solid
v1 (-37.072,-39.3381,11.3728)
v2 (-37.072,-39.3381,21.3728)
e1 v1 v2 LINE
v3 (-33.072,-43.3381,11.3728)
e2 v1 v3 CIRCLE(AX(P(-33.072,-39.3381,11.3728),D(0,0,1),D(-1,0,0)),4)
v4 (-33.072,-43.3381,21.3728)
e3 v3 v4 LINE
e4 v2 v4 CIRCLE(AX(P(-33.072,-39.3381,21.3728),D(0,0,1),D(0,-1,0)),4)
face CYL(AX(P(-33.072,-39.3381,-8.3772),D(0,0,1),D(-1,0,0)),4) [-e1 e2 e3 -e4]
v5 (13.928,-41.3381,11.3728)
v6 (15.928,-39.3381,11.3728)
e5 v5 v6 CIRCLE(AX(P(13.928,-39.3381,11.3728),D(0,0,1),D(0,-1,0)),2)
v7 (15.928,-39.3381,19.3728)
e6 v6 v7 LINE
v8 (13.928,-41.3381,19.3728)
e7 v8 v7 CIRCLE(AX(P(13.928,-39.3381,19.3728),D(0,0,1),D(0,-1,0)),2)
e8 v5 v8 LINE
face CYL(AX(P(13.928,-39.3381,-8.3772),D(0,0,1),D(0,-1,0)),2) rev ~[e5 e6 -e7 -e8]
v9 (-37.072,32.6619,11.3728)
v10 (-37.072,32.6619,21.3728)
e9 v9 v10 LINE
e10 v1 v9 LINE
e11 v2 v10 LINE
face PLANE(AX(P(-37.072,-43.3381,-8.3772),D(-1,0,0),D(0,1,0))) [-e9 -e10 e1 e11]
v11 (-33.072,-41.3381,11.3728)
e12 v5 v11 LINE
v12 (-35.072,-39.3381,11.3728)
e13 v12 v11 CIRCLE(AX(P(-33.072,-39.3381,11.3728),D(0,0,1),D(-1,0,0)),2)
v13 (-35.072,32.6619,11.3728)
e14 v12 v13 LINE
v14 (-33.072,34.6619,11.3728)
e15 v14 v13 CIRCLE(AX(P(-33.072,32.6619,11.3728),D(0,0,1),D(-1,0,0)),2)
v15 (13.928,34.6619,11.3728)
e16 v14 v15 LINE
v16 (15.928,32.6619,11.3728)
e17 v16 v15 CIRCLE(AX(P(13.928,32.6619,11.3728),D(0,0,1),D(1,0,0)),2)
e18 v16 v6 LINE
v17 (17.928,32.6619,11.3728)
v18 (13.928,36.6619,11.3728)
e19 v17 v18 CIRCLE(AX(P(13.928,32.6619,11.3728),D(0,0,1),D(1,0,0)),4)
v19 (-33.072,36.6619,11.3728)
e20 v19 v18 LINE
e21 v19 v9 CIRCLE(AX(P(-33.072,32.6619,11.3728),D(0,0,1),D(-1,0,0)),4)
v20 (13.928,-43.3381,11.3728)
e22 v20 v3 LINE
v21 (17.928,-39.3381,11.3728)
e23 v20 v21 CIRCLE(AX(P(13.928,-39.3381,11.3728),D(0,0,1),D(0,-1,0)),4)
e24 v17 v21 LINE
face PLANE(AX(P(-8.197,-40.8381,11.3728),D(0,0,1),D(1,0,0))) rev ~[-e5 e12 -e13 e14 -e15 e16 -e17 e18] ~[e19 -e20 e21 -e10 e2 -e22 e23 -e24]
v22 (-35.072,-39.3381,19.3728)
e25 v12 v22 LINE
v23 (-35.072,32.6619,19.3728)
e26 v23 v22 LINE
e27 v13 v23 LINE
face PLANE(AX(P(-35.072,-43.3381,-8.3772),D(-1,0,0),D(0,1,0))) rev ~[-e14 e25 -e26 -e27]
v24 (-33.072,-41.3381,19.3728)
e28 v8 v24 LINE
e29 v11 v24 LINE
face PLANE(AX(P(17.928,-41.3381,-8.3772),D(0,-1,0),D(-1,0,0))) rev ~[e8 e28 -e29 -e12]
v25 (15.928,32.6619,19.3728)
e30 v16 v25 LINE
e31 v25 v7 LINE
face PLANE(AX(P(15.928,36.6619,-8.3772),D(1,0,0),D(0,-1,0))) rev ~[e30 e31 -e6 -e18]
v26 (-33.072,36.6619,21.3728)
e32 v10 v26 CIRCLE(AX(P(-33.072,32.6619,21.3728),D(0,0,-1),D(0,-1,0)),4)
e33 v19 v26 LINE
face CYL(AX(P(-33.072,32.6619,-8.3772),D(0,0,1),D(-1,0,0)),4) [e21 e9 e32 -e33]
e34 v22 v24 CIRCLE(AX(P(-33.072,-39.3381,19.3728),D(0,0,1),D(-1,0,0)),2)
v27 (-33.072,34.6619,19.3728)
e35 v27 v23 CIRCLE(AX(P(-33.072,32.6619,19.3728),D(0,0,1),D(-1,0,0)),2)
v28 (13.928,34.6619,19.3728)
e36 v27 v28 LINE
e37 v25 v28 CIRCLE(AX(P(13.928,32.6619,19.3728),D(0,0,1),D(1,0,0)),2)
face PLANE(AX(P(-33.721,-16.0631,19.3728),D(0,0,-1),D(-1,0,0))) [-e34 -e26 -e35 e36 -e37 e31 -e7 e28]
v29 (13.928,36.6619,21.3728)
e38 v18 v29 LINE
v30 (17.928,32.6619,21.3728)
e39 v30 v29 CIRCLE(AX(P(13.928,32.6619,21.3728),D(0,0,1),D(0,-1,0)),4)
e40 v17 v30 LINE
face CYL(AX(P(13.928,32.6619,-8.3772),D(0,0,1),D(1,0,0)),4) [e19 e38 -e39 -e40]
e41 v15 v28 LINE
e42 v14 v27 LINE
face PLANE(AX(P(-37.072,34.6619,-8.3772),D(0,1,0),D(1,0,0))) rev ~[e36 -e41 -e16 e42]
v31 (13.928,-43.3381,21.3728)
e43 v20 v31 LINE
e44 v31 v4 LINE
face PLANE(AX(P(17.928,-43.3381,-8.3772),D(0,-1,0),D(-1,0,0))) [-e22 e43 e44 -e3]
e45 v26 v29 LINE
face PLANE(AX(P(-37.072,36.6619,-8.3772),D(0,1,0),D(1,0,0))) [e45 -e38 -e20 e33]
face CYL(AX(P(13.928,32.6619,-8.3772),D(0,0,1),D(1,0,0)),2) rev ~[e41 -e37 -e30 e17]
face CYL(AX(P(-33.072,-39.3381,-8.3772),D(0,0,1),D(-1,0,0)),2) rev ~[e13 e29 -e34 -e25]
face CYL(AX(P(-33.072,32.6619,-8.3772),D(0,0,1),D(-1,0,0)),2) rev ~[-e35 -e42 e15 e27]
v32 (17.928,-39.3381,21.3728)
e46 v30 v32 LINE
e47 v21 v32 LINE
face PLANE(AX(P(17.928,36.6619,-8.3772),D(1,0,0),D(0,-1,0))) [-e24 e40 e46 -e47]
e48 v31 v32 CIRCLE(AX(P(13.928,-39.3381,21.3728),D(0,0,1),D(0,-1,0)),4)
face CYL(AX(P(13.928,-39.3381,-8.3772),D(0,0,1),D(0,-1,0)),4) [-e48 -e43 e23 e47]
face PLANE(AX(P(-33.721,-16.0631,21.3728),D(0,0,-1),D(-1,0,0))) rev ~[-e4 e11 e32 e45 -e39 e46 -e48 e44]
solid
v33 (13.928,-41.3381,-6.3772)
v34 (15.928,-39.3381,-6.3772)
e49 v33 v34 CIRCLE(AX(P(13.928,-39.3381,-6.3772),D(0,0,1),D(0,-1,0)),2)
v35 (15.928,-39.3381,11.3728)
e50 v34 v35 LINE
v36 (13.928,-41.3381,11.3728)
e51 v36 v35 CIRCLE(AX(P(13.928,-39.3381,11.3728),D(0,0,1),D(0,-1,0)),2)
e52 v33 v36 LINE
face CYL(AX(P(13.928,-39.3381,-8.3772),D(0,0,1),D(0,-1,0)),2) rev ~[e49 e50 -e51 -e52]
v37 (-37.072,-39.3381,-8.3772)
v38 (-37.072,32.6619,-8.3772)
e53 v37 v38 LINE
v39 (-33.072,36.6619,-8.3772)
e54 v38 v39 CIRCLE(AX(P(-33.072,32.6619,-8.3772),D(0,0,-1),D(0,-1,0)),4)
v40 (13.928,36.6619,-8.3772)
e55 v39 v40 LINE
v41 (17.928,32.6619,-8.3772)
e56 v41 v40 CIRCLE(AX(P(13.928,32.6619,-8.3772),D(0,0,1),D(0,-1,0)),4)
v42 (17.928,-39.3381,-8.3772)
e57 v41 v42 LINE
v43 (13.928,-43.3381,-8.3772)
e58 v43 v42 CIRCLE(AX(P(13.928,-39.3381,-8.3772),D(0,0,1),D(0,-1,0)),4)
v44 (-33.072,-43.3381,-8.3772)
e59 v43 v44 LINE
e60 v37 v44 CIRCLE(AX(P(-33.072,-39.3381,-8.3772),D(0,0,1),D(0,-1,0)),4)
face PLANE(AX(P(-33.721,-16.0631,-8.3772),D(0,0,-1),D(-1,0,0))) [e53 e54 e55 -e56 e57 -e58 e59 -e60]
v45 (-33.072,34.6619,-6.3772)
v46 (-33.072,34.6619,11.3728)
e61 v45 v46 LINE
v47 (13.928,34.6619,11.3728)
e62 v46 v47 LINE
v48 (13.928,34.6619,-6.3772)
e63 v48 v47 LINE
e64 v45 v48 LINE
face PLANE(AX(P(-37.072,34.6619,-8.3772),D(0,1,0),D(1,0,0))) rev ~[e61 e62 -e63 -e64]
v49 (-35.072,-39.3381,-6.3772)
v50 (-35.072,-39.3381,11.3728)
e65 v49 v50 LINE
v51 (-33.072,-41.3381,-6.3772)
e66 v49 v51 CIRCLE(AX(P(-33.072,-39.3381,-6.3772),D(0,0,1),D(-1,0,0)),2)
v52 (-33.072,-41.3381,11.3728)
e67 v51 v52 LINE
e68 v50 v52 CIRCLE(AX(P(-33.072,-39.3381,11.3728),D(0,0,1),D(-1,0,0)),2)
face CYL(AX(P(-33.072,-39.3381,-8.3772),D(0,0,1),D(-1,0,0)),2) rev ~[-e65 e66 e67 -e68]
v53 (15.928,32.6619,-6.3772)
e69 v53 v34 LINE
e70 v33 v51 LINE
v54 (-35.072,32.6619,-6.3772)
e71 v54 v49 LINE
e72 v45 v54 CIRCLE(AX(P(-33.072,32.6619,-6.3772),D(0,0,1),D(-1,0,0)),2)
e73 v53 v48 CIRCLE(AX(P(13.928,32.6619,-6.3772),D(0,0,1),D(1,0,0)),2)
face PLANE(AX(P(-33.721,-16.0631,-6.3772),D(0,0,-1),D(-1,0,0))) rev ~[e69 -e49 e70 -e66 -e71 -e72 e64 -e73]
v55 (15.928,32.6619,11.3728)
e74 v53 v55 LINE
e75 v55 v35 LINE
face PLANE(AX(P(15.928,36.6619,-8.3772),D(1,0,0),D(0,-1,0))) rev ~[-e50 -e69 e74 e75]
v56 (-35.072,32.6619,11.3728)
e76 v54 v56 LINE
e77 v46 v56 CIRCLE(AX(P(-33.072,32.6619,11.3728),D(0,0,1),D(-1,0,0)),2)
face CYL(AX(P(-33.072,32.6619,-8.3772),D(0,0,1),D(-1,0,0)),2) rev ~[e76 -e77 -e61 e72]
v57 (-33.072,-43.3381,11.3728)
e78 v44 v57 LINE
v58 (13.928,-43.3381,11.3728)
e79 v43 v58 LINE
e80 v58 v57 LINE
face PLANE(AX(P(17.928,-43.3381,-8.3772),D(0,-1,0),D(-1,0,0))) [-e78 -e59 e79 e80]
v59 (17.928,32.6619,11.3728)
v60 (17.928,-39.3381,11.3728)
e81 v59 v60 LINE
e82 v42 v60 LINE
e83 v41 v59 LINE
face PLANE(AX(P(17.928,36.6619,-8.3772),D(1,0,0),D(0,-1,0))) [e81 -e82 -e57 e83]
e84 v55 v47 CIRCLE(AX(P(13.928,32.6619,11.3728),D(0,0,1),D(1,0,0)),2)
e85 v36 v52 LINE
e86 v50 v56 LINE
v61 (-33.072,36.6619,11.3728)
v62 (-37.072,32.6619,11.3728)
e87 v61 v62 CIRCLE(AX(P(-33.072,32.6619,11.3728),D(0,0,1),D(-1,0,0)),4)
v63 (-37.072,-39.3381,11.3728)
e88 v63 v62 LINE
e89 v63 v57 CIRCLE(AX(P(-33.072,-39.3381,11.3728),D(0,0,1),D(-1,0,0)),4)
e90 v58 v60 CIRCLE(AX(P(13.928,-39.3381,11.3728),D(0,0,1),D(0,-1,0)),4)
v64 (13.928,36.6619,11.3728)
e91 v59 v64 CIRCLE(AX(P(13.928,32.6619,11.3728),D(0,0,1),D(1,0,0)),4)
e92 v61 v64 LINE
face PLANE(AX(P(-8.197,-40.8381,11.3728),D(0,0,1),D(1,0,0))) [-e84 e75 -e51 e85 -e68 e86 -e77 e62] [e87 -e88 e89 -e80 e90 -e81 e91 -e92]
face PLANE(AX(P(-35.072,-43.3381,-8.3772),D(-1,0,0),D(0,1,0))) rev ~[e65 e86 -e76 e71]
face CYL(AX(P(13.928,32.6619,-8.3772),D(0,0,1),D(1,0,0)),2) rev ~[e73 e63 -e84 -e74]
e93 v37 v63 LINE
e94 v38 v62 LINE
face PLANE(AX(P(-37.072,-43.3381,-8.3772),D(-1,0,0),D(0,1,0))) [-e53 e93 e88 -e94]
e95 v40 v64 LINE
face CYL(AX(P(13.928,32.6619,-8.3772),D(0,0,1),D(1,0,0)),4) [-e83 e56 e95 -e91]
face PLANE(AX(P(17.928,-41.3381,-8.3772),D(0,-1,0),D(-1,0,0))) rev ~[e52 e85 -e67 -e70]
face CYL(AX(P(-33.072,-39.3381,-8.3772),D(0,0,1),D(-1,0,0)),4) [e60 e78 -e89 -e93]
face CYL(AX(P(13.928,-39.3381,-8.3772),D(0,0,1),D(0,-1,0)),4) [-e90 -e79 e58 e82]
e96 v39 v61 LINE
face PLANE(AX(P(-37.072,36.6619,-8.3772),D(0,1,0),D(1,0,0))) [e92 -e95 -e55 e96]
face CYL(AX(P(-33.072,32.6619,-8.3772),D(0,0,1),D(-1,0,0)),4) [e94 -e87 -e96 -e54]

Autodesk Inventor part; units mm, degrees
ref_plane "YZ Plane" through (0, 0, 0) normal (1, 0, 0) x (0, 1, 0)
ref_plane "XZ Plane" through (0, 0, 0) normal (0, 1, 0) x (-1, 0, 0)
ref_plane "Work Plane3" through (-33.721, -16.0631, -8.3772) normal (0, 0, -1) x (-1, 0, 0)
sketch "Sketch2" plane through (-33.721, -16.0631, -8.3772) normal (0, 0, -1) x (-1, 0, 0)
  line L0 (3.351, 52.725) -> (-51.649, 52.725)
  line L1 (-51.649, 52.725) -> (-51.649, -27.275)
  line L2 (-51.649, -27.275) -> (3.351, -27.275)
  line L3 (3.351, -27.275) -> (3.351, 52.725)
  line L4 (3.351, 52.725) -> (-51.649, -27.275) construction
  line L5 (-51.649, 52.725) -> (3.351, -27.275) construction
  line L6 (-25.524, -24.775) -> (-3.524, -24.775) projected
  line L7 (-0.024, 32.975) -> (-0.024, 14.6) projected
  line L8 (-48.274, -10.275) -> (-48.274, 32.975) projected
  line L9 (-3.524, 50.225) -> (-25.524, 50.225) projected
  point P0 (-33.721, 16.0631)
  point P1 (-24.149, 12.725)
  dimension "d2" = 55
  dimension "d3" = 80
  dimension "d4" = 2.5
  dimension "d5" = 3.375
  dimension "d6" = 3.375
  dimension "d7" = 2.5
ref_plane "Work Plane4" through (-28.697, -42.3381, 21.3728) normal (0, 0, 1) x (1, 0, 0)
extrude "Extrusion1" add sketch "Sketch2" against normal up to surface (29.75 mm away)
fillet "Fillet1" radius 4 4 edges at (-37.072, -43.3381, 6.4978) (17.928, -43.3381, 6.4978) (17.928, 36.6619, 6.4978) (-37.072, 36.6619, 6.4978)
shell "Shell1" thickness 2 removed faces 0
ref_plane "Work Plane5" through (-8.197, -40.8381, 11.3728) normal (0, 0, 1) x (1, 0, 0)
split body "Split1" result two bodies by plane through (-8.197, -40.8381, 11.3728) normal (0, 0, 1) first body at (-18.7387, 8.6619, 20.8728)
equation "\"d6\" = d5"
equation "\"d7\" = d4"
properties part number "bottom"
